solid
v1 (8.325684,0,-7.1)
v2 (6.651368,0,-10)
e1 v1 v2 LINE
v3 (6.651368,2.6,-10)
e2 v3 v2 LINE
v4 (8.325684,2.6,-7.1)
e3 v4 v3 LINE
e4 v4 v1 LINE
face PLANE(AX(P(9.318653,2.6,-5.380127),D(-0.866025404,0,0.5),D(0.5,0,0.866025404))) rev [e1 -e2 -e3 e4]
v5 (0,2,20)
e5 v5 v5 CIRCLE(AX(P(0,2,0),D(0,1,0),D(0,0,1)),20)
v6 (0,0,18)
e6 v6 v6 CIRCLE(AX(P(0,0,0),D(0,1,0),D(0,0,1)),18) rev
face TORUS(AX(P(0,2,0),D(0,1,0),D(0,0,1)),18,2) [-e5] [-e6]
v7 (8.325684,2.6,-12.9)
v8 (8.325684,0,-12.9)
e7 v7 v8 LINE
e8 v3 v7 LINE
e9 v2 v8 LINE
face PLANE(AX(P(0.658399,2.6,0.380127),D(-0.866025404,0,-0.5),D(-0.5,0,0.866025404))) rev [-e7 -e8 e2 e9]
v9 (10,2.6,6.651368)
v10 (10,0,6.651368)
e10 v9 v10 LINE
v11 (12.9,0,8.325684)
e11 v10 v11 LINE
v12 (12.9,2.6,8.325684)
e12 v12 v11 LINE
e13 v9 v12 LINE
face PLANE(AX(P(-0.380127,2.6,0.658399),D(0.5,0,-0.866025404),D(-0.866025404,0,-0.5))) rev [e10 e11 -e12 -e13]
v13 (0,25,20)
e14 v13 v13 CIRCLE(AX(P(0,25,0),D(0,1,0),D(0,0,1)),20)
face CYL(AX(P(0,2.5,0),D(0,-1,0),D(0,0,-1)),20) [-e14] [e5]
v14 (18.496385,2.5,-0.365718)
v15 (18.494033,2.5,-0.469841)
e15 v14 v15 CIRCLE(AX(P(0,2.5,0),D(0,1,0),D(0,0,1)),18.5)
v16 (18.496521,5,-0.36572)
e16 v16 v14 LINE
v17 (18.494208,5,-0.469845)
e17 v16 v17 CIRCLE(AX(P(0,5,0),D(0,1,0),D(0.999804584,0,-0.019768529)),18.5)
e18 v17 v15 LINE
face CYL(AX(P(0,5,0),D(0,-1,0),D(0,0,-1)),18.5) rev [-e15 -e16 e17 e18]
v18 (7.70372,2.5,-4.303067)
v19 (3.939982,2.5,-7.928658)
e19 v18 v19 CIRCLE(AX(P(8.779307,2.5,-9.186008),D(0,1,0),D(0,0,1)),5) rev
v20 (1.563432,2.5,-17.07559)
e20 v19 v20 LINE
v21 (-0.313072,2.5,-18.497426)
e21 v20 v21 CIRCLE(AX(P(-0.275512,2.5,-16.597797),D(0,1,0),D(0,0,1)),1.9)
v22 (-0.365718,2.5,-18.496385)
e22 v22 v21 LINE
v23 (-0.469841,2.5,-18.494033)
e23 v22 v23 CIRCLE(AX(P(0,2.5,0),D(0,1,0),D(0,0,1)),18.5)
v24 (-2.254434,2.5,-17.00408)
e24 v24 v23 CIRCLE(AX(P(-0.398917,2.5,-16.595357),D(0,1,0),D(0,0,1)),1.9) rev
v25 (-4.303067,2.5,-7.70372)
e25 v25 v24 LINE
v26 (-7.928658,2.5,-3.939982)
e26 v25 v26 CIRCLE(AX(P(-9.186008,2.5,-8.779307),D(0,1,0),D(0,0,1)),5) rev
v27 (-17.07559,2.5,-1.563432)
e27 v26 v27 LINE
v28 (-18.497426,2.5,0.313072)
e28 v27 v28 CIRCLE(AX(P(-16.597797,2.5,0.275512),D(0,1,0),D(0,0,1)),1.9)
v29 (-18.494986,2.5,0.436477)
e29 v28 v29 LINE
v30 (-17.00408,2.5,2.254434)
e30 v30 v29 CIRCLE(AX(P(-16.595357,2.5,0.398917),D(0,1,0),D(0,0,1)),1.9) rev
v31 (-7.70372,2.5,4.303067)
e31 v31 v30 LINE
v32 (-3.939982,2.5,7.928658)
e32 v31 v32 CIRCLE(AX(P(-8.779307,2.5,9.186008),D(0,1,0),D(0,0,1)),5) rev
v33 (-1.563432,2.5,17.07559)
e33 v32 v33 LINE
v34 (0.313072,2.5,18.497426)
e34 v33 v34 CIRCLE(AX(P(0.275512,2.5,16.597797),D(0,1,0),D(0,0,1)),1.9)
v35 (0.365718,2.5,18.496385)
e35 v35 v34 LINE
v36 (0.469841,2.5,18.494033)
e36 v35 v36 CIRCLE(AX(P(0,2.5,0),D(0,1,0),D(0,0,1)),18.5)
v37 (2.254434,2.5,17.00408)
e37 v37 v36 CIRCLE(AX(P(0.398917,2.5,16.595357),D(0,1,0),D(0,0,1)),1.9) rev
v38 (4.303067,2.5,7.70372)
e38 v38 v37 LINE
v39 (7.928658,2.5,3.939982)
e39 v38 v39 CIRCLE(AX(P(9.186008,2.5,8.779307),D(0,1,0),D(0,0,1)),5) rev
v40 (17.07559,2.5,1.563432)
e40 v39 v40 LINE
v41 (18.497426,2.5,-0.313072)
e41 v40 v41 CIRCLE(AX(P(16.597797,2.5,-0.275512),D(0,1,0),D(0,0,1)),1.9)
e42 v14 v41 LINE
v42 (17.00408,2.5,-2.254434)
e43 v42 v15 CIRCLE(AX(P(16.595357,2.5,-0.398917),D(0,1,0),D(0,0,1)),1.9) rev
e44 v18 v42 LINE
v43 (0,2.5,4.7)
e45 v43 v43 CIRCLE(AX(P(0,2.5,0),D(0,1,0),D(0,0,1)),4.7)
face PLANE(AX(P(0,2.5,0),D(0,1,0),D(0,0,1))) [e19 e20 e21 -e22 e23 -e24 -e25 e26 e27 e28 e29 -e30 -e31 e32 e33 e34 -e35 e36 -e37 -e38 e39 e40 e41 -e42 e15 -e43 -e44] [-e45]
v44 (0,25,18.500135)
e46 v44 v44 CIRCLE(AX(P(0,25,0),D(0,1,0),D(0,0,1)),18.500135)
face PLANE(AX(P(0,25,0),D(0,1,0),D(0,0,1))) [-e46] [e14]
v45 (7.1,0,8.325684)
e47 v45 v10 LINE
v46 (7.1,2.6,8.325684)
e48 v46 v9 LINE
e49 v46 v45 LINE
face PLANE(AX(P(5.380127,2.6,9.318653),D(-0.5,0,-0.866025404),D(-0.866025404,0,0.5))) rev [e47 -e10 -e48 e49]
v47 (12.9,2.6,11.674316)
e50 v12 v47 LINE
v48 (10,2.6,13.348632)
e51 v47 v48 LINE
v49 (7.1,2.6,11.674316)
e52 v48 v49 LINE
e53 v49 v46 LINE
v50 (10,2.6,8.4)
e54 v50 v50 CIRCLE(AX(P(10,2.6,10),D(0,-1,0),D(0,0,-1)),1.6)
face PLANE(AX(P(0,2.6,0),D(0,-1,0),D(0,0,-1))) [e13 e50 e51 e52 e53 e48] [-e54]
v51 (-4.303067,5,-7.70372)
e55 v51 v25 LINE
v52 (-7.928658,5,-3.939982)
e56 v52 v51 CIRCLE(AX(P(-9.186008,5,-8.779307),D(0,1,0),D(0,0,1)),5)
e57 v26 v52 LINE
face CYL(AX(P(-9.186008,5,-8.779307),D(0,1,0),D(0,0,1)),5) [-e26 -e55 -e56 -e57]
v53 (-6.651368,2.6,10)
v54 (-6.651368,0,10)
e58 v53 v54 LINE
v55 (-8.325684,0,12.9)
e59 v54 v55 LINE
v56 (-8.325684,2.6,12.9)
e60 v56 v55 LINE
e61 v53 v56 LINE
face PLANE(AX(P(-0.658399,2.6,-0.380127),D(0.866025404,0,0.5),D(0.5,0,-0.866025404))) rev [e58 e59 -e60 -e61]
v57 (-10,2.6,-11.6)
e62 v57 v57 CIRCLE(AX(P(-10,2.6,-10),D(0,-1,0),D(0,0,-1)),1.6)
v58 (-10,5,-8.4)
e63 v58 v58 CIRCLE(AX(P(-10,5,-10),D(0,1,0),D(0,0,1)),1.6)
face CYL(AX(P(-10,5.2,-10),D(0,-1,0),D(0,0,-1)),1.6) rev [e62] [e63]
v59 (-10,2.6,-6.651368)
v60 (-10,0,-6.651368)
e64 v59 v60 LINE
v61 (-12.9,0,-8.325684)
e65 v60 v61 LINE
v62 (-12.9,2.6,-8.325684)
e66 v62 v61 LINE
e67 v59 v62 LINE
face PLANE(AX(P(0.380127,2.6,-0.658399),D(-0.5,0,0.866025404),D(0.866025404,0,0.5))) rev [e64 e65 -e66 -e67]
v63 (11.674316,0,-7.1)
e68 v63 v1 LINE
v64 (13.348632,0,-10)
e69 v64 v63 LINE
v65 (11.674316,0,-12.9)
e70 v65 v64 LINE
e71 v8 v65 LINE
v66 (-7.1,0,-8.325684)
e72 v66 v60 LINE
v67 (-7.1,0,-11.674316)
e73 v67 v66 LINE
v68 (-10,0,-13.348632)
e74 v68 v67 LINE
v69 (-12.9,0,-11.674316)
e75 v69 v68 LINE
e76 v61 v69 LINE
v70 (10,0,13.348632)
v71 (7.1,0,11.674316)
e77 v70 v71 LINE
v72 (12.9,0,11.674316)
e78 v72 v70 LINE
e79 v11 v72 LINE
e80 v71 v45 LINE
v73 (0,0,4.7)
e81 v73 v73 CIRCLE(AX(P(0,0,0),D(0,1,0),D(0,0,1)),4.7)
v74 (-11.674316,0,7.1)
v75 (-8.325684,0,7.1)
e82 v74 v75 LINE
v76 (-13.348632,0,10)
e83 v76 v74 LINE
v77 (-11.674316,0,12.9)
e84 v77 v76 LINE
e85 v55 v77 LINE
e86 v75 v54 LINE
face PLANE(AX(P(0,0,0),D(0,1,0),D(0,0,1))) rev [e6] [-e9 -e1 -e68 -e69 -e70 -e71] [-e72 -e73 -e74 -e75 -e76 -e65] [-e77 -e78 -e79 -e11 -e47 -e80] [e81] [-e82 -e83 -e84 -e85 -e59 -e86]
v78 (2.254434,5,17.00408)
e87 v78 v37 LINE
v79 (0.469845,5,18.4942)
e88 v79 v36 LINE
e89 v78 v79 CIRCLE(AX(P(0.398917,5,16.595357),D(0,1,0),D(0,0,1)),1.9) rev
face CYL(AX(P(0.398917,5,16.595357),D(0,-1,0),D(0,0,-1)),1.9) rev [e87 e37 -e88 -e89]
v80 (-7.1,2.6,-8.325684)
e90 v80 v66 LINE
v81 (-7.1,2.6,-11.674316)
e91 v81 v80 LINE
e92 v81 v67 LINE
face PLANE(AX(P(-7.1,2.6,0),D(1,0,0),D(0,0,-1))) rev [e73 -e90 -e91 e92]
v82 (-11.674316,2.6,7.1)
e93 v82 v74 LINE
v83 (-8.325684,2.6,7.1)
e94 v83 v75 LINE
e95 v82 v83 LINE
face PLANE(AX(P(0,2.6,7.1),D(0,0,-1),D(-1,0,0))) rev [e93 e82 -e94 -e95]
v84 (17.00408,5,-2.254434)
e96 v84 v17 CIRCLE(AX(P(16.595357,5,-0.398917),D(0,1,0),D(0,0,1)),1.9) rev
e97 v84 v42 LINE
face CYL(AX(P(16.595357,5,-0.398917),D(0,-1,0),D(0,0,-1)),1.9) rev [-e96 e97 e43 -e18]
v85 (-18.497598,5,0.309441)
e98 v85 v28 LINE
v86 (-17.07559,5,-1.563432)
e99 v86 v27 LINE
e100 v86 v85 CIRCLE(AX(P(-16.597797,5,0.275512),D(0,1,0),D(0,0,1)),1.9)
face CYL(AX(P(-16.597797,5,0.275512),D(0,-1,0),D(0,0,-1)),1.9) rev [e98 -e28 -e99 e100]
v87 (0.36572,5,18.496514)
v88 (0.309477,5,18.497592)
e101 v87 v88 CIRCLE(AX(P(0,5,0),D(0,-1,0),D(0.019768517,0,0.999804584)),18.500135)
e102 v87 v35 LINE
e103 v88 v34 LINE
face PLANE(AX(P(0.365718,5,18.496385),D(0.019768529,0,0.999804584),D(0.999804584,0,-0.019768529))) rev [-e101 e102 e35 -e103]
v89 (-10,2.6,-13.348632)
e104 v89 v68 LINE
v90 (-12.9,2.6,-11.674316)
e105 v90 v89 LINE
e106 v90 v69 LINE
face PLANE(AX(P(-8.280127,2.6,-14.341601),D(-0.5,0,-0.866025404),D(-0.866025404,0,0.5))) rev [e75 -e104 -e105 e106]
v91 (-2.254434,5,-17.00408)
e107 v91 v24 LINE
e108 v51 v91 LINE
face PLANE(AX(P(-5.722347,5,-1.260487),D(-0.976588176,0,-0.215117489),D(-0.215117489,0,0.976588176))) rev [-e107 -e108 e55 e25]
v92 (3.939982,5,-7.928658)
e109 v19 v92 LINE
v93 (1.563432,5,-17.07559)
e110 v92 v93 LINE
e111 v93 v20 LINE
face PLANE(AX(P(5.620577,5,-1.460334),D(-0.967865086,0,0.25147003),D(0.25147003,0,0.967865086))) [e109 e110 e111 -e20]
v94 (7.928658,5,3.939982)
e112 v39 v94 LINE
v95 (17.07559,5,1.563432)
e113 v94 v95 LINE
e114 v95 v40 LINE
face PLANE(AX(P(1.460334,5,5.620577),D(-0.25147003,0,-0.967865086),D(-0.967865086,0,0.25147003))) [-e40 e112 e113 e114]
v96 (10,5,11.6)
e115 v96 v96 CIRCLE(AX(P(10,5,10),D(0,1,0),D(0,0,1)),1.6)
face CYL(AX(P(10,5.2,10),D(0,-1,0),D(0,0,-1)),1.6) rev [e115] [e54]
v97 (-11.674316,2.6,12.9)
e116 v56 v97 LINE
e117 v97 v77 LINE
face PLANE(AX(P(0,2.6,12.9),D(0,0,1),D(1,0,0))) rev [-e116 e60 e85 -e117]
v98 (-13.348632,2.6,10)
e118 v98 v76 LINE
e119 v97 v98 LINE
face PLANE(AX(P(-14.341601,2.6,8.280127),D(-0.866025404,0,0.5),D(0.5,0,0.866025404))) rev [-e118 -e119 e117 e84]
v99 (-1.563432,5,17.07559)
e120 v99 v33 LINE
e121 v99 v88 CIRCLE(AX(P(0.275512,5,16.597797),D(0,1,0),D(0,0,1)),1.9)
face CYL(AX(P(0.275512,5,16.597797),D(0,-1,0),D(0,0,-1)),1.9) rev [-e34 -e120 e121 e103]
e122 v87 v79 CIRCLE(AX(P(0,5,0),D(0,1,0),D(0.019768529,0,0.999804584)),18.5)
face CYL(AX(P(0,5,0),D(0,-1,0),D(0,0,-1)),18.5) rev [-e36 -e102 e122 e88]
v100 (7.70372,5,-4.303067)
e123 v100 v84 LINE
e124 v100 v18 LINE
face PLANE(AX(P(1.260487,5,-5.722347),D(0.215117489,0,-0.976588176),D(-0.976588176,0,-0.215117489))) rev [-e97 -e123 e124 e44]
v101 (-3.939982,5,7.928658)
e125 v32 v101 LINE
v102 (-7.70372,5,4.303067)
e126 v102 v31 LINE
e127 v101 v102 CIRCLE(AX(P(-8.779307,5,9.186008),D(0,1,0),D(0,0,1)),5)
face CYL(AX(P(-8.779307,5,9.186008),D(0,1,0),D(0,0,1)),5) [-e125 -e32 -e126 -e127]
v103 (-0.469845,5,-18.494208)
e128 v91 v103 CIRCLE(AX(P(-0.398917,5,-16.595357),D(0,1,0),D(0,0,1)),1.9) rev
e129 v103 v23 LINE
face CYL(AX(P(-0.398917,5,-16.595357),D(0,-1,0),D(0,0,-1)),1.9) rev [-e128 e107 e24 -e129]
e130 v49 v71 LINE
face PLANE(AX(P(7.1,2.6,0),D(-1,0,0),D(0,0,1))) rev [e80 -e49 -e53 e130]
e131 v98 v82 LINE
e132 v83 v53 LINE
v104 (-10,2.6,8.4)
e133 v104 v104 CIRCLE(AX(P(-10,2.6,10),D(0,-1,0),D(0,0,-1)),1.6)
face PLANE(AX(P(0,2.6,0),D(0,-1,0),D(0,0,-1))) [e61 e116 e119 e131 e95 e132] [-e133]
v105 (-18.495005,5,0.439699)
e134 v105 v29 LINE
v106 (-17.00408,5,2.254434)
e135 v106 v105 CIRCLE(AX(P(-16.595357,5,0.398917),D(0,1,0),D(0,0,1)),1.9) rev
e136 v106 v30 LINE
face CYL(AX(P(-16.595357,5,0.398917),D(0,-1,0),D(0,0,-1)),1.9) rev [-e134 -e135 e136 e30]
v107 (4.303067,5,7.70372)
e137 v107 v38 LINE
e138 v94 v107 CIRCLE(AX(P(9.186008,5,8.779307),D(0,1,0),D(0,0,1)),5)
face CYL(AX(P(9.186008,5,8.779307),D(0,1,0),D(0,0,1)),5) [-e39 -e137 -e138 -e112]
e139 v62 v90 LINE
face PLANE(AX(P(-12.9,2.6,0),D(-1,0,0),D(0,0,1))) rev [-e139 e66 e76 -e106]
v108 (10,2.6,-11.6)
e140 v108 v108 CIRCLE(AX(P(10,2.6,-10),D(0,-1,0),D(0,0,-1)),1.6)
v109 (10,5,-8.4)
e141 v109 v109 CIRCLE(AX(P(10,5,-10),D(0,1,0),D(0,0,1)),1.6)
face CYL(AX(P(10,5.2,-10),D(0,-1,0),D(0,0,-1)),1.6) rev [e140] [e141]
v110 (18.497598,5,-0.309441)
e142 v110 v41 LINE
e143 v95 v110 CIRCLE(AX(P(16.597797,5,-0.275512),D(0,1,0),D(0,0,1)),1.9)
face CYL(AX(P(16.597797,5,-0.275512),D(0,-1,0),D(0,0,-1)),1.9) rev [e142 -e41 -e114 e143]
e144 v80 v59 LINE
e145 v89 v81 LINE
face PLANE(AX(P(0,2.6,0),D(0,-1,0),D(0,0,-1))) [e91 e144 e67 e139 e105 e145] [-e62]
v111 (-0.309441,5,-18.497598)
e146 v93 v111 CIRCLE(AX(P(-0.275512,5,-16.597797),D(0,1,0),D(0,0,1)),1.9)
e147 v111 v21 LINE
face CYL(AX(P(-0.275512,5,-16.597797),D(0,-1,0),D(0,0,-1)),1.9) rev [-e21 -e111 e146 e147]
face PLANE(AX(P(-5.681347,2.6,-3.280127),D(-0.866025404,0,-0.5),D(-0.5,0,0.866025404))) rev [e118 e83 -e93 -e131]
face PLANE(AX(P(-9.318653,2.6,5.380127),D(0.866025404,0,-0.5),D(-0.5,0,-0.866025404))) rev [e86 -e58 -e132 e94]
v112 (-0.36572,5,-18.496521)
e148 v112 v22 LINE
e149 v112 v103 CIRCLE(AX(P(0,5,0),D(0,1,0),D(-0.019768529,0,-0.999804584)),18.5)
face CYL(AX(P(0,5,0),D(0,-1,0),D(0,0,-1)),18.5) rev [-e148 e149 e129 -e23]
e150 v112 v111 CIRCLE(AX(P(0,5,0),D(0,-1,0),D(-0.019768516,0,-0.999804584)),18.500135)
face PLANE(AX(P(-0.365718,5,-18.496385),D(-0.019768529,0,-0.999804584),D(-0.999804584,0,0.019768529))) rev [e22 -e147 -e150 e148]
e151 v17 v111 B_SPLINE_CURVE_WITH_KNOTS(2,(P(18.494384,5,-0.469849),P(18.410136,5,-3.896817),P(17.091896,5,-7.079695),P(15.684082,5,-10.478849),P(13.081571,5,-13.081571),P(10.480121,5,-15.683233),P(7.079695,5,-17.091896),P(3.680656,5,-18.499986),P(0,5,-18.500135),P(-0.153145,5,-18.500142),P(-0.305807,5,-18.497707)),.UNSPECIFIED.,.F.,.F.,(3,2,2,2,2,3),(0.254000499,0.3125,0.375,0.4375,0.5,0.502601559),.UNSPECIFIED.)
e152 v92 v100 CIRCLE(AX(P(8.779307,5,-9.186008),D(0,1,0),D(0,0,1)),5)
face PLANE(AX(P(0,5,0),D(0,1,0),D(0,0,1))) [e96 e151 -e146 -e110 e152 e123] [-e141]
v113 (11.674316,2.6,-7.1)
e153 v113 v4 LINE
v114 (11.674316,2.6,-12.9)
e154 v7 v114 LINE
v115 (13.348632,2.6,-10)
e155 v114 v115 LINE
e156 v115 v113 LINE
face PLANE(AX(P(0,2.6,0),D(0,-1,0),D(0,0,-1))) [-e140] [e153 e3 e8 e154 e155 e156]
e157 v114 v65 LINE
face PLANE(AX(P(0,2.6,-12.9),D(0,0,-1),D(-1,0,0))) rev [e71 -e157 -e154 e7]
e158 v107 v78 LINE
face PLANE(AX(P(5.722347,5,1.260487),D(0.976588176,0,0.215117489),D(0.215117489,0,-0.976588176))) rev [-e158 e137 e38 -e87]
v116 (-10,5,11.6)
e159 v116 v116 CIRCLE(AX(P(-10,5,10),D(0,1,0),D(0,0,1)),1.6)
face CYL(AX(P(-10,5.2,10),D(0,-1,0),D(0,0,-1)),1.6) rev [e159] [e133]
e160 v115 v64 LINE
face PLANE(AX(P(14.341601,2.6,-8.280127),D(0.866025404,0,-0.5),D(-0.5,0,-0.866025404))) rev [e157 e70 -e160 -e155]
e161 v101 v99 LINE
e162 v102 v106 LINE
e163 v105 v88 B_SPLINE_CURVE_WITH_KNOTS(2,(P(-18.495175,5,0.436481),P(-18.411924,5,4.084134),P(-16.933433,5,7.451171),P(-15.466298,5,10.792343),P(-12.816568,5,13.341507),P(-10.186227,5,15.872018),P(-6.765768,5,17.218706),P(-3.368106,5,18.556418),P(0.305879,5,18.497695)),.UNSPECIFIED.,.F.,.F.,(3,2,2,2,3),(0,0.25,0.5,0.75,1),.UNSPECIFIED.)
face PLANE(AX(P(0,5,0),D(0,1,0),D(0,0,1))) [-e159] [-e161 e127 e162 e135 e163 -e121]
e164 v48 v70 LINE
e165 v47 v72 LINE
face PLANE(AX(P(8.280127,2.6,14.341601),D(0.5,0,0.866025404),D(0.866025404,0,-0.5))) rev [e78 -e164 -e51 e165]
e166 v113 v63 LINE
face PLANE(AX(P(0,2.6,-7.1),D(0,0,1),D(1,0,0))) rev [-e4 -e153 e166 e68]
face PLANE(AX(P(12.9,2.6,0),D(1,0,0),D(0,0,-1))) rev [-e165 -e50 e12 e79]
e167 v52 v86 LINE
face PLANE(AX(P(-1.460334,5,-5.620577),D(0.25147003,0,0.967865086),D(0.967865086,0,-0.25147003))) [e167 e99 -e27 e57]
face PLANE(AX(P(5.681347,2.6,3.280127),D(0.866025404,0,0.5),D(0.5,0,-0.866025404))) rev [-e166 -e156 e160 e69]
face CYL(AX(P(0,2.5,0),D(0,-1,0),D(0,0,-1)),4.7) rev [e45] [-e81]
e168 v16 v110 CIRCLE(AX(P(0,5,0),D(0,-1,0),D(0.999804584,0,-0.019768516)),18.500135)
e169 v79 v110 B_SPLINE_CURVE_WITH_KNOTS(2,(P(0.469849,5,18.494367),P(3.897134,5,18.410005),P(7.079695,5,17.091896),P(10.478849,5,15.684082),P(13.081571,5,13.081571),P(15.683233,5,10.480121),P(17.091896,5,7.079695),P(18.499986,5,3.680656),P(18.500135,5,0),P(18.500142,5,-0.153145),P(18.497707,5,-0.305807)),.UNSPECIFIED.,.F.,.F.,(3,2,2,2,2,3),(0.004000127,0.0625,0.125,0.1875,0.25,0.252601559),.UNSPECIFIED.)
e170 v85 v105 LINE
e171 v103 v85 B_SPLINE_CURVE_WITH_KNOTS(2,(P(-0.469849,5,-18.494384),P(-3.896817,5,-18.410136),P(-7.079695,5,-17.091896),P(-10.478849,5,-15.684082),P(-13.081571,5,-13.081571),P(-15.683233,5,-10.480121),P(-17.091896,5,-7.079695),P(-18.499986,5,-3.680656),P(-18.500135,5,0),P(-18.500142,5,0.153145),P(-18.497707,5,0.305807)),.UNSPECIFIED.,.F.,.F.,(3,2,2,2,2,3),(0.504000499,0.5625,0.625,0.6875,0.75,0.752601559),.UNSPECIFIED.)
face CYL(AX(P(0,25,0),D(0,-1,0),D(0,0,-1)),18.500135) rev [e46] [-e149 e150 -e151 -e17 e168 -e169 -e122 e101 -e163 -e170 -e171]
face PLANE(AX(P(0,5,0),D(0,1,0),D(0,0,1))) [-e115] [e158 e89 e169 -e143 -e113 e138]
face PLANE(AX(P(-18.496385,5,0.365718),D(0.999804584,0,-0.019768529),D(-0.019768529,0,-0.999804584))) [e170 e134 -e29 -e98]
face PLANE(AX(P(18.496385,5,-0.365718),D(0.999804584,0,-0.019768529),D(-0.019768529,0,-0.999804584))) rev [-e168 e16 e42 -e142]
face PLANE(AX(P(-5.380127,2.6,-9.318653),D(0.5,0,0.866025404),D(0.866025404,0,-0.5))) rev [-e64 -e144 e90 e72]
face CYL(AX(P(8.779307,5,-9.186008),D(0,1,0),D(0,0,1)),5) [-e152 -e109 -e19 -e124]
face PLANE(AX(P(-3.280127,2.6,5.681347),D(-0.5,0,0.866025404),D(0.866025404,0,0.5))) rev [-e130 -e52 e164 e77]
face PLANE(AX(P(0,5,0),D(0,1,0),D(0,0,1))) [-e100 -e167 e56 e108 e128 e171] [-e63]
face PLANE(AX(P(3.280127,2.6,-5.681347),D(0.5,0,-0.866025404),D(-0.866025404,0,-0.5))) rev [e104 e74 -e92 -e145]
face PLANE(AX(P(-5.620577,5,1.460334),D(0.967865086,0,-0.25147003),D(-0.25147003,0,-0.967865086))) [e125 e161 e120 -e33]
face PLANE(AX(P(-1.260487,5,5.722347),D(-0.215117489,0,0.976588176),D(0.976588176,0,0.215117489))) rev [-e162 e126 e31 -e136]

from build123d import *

# Parameters (mm, degrees)
SKETCH_1_R          = 20
SKETCH_1_R_2        = 4.7
EXTRUDE_1_DEPTH     = 2.5
SKETCH_2_R          = 20
EXTRUDE_2_DEPTH     = 2.5
FILLET_1_R          = 5
SKETCH_3_R          = 20
SKETCH_3_R_2        = 18.500135374
EXTRUDE_3_DEPTH     = 20
CUT_EXTRUDE_1_DEPTH = 2.6
SKETCH_5_R          = 1.6
CUT_EXTRUDE_2_DEPTH = 2.6
FILLET_2_R          = 2


with BuildPart() as part:
    # 草图1 → 凸台-拉伸1 (new body)
    with BuildSketch(Plane(origin=(0, 0, 0), x_dir=(1, 0, 0), z_dir=(0, 1, 0))):
        Circle(SKETCH_1_R)
        Circle(SKETCH_1_R_2, mode=Mode.SUBTRACT)
    extrude(amount=EXTRUDE_1_DEPTH)

    # 草图2 → 凸台-拉伸2 (add)
    with BuildSketch(Plane(origin=(0, 2.5, 0), x_dir=(1, 0, 0), z_dir=(0, 1, 0))):
        Circle(SKETCH_2_R)
        with BuildLine():
            Line((-1.563432113, -17.075590083), (-4.71068404, -4.96235635))
            Line((-4.71068404, -4.96235635), (-17.004080234, -2.254434443))
            ThreePointArc((-17.004080234, -2.254434443), (-18.064494297, -1.603755329), (-18.494985714, -0.436477113))
            Line((-18.494985714, -0.436477113), (-18.496384796, -0.365717778))
            Line((-18.496384796, -0.365717778), (-18.497425733, -0.313071754))
            ThreePointArc((-18.497425733, -0.313071754), (-18.11217817, 0.871942042), (-17.075590083, 1.563432113))
            Line((-17.075590083, 1.563432113), (-4.96235635, 4.71068404))
            Line((-4.96235635, 4.71068404), (-2.254434443, 17.004080234))
            ThreePointArc((-2.254434443, 17.004080234), (-1.616612902, 18.053855023), (-0.469840502, 18.494032819))
            ThreePointArc((-0.469840502, 18.494032819), (-0.417780795, 18.49528208), (-0.365717778, 18.496384796))
            Line((-0.365717778, 18.496384796), (-0.313071754, 18.497425733))
            ThreePointArc((-0.313071754, 18.497425733), (0.871942042, 18.11217817), (1.563432113, 17.075590083))
            Line((1.563432113, 17.075590083), (4.71068404, 4.96235635))
            Line((4.71068404, 4.96235635), (17.004080234, 2.254434443))
            ThreePointArc((17.004080234, 2.254434443), (18.053855023, 1.616612902), (18.494032819, 0.469840502))
            ThreePointArc((18.494032819, 0.469840502), (18.49528208, 0.417780795), (18.496384796, 0.365717778))
            Line((18.496384796, 0.365717778), (18.497425733, 0.313071754))
            ThreePointArc((18.497425733, 0.313071754), (18.11217817, -0.871942042), (17.075590083, -1.563432113))
            Line((17.075590083, -1.563432113), (4.96235635, -4.71068404))
            Line((4.96235635, -4.71068404), (2.254434443, -17.004080234))
            ThreePointArc((2.254434443, -17.004080234), (1.616612902, -18.053855023), (0.469840502, -18.494032819))
            ThreePointArc((0.469840502, -18.494032819), (0.417780795, -18.49528208), (0.365717778, -18.496384796))
            Line((0.365717778, -18.496384796), (0.313071754, -18.497425733))
            ThreePointArc((0.313071754, -18.497425733), (-0.871942042, -18.11217817), (-1.563432113, -17.075590083))
        make_face(mode=Mode.SUBTRACT)
    extrude(amount=EXTRUDE_2_DEPTH)

    # 圆角1
    fillet_1_edges = [part.edges().sort_by_distance(p)[0] for p in [
        (-4.71068404, 3.75, 4.96235635),
        (-4.96235635, 3.75, -4.71068404),
        (4.96235635, 3.75, 4.71068404),
        (4.71068404, 3.75, -4.96235635),
    ]]
    fillet(fillet_1_edges, radius=FILLET_1_R)

    # 草图3 → 凸台-拉伸3 (add)
    with BuildSketch(Plane(origin=(0, 5, 0), x_dir=(1, 0, 0), z_dir=(0, 1, 0))):
        Circle(SKETCH_3_R)
        Circle(SKETCH_3_R_2, mode=Mode.SUBTRACT)
    extrude(amount=EXTRUDE_3_DEPTH)

    # 草图4 → 切除-拉伸1 (cut)
    with BuildSketch(Plane.XZ):
        Polygon((-7.1, -11.674315781), (-7.1, -8.325684219), (-10, -6.651368439), (-12.9, -8.325684219), (-12.9, -11.674315781), (-10, -13.348631561), align=None)
        Polygon((-11.674315781, 7.1), (-8.325684219, 7.1), (-6.651368439, 10), (-8.325684219, 12.9), (-11.674315781, 12.9), (-13.348631561, 10), align=None)
        Polygon((8.325684219, -7.1), (6.651368439, -10), (8.325684219, -12.9), (11.674315781, -12.9), (13.348631561, -10), (11.674315781, -7.1), align=None)
        Polygon((7.1, 11.674315781), (7.1, 8.325684219), (10, 6.651368439), (12.9, 8.325684219), (12.9, 11.674315781), (10, 13.348631561), align=None)
    extrude(amount=-CUT_EXTRUDE_1_DEPTH, mode=Mode.SUBTRACT)

    # 草图5 → 切除-拉伸2 (cut)
    with BuildSketch(Plane.XZ.offset(-2.6)):
        with Locations((10, -10)):
            Circle(SKETCH_5_R)
        with Locations((-10, -10)):
            Circle(SKETCH_5_R)
        with Locations((-10, 10)):
            Circle(SKETCH_5_R)
        with Locations((10, 10)):
            Circle(SKETCH_5_R)
    extrude(amount=-CUT_EXTRUDE_2_DEPTH, mode=Mode.SUBTRACT)

    # 圆角2
    fillet_2_edges = [part.edges().sort_by_distance(p)[0] for p in [
        (-20, 0, 0),
    ]]
    fillet(fillet_2_edges, radius=FILLET_2_R)


solid = part.part
